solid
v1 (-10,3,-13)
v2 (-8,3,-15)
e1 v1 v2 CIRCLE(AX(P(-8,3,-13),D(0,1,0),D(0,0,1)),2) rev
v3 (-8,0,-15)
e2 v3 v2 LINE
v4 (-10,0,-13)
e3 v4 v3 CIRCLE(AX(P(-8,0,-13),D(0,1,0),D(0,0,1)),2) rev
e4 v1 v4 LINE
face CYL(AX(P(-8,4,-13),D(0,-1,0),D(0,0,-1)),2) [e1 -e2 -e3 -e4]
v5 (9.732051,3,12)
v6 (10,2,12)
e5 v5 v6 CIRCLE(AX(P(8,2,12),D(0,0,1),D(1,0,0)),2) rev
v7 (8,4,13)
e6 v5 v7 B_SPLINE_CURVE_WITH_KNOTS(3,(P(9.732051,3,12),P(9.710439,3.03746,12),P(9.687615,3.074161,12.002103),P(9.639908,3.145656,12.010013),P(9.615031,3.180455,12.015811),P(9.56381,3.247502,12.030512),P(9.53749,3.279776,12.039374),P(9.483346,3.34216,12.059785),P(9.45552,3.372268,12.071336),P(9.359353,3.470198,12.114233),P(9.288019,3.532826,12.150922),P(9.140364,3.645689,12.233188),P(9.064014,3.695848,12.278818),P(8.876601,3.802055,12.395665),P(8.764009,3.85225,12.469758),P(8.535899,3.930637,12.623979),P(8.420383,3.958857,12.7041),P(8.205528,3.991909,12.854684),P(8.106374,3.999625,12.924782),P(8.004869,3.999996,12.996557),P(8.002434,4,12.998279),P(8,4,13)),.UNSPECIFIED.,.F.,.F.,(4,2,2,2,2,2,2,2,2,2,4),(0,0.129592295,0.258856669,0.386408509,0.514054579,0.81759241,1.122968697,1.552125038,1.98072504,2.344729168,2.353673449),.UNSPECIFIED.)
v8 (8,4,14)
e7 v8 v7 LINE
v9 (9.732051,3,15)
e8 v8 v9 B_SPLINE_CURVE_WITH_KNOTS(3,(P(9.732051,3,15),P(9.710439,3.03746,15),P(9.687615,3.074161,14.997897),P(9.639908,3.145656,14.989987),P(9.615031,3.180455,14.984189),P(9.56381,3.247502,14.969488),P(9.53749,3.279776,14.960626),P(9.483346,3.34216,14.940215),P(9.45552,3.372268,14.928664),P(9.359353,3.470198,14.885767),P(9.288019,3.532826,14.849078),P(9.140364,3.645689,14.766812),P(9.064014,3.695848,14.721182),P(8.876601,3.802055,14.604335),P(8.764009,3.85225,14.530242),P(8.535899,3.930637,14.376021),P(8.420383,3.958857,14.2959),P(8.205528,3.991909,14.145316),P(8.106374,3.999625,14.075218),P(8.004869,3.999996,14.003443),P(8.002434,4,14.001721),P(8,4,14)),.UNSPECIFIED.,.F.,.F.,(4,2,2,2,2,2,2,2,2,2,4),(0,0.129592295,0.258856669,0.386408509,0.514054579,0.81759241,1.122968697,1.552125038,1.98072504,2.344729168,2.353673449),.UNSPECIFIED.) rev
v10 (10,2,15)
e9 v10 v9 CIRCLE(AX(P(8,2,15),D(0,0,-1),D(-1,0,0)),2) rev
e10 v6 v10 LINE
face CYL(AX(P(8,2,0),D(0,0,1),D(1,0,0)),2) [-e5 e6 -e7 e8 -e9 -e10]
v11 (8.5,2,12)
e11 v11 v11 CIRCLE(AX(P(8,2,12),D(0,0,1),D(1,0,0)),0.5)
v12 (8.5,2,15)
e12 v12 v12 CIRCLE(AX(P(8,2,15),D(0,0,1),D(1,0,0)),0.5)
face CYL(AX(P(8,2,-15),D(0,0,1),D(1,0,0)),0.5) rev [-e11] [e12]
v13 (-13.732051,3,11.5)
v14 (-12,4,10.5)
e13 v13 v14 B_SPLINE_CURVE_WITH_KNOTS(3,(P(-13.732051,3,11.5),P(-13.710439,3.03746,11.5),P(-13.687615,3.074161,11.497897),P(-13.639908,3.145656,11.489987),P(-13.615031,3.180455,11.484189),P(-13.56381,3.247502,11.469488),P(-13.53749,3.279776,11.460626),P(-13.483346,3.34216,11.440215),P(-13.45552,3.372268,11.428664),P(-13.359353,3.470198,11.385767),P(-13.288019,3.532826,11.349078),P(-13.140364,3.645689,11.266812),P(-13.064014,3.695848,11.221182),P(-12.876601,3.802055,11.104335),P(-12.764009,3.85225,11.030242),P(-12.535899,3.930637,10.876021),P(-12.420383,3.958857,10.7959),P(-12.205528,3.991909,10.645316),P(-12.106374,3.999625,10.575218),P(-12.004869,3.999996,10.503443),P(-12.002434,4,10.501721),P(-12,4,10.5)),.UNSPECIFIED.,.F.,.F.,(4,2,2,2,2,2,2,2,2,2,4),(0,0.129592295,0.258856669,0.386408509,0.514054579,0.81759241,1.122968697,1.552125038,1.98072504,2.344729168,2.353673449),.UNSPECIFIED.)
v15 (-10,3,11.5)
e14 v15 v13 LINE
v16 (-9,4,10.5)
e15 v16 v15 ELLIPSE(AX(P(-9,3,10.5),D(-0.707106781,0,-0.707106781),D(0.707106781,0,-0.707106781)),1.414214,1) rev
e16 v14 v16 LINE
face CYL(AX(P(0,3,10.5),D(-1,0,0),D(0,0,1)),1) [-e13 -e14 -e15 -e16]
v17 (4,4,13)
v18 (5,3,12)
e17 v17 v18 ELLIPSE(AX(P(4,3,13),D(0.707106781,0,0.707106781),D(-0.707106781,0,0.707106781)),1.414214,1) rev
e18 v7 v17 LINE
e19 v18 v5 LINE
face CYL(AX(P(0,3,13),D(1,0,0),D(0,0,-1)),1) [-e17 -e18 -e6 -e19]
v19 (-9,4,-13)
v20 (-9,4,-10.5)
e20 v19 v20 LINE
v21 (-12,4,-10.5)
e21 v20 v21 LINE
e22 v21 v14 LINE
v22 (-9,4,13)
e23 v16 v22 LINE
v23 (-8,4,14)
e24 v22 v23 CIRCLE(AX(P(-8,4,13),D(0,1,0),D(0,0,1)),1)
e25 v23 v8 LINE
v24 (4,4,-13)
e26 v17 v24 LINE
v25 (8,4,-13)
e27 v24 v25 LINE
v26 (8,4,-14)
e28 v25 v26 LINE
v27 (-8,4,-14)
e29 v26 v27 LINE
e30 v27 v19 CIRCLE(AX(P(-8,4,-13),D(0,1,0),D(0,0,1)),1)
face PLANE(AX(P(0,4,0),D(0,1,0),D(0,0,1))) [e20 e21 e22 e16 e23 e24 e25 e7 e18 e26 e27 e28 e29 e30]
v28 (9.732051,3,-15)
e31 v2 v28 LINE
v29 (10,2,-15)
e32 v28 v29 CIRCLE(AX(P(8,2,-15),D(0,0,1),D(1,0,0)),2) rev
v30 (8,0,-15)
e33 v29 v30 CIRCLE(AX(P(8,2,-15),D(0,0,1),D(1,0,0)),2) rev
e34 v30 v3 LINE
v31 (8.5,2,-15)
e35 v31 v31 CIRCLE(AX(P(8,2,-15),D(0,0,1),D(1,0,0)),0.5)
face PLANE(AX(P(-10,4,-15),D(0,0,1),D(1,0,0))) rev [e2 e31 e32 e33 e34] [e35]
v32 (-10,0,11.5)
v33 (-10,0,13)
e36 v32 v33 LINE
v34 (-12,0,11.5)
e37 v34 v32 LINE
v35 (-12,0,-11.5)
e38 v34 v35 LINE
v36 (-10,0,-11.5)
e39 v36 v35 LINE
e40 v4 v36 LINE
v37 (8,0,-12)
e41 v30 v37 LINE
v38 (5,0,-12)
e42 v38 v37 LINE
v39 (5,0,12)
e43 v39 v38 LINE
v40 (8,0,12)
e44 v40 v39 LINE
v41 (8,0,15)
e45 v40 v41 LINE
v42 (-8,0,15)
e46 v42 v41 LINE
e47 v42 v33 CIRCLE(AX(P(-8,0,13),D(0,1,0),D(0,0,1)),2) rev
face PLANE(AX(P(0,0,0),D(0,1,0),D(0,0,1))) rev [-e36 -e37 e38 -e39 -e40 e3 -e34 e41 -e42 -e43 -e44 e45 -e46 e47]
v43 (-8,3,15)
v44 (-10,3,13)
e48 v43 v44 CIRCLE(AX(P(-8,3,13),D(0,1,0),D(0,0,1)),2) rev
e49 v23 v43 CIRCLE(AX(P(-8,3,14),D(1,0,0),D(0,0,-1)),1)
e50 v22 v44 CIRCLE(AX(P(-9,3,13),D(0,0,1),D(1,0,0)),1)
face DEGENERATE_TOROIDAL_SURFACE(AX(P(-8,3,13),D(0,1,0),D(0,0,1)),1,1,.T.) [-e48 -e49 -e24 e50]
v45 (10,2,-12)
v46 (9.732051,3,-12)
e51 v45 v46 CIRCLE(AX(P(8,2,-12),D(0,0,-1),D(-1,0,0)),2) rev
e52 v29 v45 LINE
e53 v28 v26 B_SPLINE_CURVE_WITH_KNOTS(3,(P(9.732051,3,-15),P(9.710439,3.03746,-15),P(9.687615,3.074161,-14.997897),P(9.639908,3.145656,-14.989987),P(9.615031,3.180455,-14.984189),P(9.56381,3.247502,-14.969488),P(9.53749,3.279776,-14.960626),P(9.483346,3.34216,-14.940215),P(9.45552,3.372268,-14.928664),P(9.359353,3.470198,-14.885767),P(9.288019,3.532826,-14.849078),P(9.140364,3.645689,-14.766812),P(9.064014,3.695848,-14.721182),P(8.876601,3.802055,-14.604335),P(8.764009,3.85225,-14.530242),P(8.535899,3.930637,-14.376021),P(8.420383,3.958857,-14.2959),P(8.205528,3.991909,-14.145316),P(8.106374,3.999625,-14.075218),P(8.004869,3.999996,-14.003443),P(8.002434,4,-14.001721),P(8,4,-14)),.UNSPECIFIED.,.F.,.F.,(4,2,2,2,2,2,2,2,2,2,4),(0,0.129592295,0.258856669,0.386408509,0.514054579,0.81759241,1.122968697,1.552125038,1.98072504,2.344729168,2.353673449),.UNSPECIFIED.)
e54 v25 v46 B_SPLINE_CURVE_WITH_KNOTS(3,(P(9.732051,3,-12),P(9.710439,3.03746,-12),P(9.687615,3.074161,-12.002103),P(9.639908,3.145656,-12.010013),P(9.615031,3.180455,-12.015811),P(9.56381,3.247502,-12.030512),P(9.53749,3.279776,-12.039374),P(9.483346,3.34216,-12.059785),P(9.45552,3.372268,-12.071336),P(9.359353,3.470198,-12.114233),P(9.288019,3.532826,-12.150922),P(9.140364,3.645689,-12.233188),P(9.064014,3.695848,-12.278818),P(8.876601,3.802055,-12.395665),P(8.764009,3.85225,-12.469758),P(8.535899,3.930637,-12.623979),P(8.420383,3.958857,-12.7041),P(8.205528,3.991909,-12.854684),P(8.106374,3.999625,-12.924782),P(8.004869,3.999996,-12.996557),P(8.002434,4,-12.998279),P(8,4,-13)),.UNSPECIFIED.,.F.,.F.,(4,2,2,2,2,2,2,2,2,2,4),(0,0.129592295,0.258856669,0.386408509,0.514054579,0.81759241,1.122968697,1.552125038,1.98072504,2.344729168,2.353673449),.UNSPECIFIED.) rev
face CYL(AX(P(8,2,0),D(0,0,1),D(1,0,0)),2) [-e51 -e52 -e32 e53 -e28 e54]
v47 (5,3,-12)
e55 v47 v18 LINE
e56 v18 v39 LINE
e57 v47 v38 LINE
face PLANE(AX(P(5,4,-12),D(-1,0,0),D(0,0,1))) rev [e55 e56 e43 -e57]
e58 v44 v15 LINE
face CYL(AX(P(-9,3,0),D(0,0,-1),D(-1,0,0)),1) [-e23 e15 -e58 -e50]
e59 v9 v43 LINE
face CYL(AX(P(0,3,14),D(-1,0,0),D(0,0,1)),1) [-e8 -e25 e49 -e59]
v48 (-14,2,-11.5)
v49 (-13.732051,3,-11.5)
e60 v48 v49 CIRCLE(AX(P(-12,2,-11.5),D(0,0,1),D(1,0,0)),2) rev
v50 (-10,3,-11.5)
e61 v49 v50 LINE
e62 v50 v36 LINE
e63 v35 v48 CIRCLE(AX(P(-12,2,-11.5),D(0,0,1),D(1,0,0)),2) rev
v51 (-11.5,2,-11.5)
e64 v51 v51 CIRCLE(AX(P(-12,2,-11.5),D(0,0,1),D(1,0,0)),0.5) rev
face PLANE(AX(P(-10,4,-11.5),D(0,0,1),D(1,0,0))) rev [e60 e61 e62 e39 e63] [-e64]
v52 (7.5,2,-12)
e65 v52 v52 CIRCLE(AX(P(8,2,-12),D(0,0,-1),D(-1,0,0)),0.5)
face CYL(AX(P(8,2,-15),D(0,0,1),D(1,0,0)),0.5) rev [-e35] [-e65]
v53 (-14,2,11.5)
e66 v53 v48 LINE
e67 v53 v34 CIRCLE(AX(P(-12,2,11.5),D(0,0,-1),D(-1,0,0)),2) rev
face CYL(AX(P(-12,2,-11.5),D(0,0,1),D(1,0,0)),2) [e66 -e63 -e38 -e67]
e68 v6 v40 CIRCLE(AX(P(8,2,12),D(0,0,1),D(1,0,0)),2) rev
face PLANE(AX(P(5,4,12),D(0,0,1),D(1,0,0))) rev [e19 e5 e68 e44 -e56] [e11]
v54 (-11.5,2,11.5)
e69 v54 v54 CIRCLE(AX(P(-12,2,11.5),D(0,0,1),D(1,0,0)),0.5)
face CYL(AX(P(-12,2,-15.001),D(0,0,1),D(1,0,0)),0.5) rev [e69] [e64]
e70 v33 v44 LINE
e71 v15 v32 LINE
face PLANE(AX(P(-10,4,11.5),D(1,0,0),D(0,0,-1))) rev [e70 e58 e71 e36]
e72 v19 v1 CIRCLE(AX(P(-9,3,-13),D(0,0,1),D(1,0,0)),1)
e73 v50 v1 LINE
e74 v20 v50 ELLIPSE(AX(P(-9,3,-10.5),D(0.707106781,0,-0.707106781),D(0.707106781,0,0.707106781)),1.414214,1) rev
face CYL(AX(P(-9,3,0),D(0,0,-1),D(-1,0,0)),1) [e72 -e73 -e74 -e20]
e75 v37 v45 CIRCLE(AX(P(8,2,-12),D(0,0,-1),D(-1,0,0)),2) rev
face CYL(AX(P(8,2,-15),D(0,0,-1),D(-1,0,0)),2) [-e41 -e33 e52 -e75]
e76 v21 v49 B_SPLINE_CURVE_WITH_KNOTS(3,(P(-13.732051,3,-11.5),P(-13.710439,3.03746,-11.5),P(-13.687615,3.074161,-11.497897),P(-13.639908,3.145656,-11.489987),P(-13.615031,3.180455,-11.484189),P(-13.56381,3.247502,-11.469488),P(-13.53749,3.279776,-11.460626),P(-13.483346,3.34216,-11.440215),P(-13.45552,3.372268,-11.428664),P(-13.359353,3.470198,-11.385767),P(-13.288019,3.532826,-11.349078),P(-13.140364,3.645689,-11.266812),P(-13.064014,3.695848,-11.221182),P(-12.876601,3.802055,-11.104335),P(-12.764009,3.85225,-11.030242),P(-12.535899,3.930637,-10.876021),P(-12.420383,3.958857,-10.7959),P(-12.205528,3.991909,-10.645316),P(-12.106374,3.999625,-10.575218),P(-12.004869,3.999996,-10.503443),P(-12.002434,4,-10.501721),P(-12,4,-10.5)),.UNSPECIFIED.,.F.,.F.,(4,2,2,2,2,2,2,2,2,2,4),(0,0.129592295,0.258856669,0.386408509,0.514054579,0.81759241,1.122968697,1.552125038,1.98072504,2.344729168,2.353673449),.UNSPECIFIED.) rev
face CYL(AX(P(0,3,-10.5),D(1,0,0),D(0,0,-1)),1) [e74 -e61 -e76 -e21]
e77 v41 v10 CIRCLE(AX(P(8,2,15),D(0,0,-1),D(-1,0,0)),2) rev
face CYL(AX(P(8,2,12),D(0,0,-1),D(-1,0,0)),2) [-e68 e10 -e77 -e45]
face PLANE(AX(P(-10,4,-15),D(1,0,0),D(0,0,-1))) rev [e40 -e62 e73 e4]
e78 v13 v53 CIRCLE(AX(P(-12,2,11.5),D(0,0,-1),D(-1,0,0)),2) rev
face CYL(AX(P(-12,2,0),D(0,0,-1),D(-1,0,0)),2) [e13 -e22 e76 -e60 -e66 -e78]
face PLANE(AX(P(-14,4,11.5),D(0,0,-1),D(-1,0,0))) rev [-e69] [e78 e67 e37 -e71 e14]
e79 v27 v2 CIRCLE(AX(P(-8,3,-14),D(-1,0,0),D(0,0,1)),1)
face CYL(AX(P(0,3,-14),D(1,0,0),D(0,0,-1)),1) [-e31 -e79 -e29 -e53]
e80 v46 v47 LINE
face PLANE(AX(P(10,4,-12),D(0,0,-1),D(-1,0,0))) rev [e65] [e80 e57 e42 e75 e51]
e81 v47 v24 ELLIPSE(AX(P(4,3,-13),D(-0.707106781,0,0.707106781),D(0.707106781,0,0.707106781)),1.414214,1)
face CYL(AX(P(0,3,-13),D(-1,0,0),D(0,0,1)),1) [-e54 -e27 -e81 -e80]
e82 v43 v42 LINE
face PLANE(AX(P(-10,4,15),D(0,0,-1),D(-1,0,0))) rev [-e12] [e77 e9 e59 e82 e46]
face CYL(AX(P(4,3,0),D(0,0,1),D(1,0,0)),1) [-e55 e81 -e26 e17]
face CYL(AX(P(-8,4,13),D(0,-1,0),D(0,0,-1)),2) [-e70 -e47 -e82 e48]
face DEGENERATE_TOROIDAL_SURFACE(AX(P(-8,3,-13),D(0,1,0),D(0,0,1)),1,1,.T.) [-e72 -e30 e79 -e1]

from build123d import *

# Parameters (mm, degrees)
EXTRUDE_1_DEPTH          = 4
CUT_EXTRUDE_1_DEPTH      = 31.6757233
CUT_EXTRUDE_1_DEPTH_BACK = 31.6757233
SKETCH_2_R               = 0.5
CUT_EXTRUDE_2_REACH      = 32.237
SKETCH_3_R               = 0.5
FILLET_1_R               = 2
FILLET_2_R               = 1


# Some blends are built 0.0001 mm under size
with BuildPart() as part:
    # Эскиз1 → Бобышка-Вытянуть1 (new body)
    with BuildSketch(Plane(origin=(0, 0, 0), x_dir=(1, 0, 0), z_dir=(0, 1, 0))):
        Polygon((-10, 15), (10, 15), (10, 12), (5, 12), (5, -12), (10, -12), (10, -15), (-10, -15), (-10, -11.5), (-14, -11.5), (-14, 11.5), (-10, 11.5), align=None)
    extrude(amount=EXTRUDE_1_DEPTH)

    # Эскиз2 → Вырез-Вытянуть1 (cut, two sides: drawn at the far end of the back side and taken through both)
    with BuildSketch(Plane.XY.offset(-12).offset(-CUT_EXTRUDE_1_DEPTH_BACK)):
        with Locations((8, 2)):
            Circle(SKETCH_2_R)
    extrude(amount=CUT_EXTRUDE_1_DEPTH + CUT_EXTRUDE_1_DEPTH_BACK, mode=Mode.SUBTRACT)

    # Эскиз3 → Вырез-Вытянуть2 (cut, up to next)
    with BuildSketch(Plane.XY.offset(11.5), mode=Mode.PRIVATE) as cut_extrude_2_sk1:
        with Locations((-12, 2)):
            Circle(SKETCH_3_R)
    cut_extrude_2_tool1 = extrude(cut_extrude_2_sk1.sketch, amount=-CUT_EXTRUDE_2_REACH, mode=Mode.PRIVATE) & part.part
    add(cut_extrude_2_tool1.solids().sort_by_distance((-12, 2, 11.5))[0], mode=Mode.SUBTRACT)

    # Скругление1
    fillet_1_edges = [part.edges().sort_by_distance(p)[0] for p in [
        (10, 0, -13.5),
        (10, 4, -13.5),
        (10, 0, 13.5),
        (10, 4, 13.5),
        (-14, 0, 0),
        (-14, 4, 0),
        (-10, 2, -15),
        (-10, 2, 15),
    ]]
    fillet(fillet_1_edges, radius=FILLET_1_R - 0.0001)  # a hair under: the kernel refuses the full size

    # Скругление2
    # the kernel refuses this fillet: 1 mm, written as the material it takes off along each edge
    with BuildSketch(Plane(origin=(5, 4, -12), x_dir=(-1, 0, 0), z_dir=(0, 0, 1))) as fillet_2_piece_1:
        with BuildLine():
            CenterArc((FILLET_2_R, FILLET_2_R), FILLET_2_R, 180, 90)
            Line((0, FILLET_2_R), (0, 0))
            Line((0, 0), (FILLET_2_R, 0))
        make_face()
    extrude(amount=24, mode=Mode.SUBTRACT)
    with BuildSketch(Plane(origin=(10.5001, 4, -12), x_dir=(0, 0, -1), z_dir=(-1, 0, 0)), Plane(origin=(5, 4, 12), x_dir=(0, 0, 1), z_dir=(1, 0, 0))) as fillet_2_piece_2:
        with BuildLine():
            CenterArc((FILLET_2_R, FILLET_2_R), FILLET_2_R, 180, 90)
            Line((0, FILLET_2_R), (0, 0))
            Line((0, 0), (FILLET_2_R, 0))
        make_face()
    extrude(amount=5.5001, mode=Mode.SUBTRACT)
    with BuildSketch(Plane(origin=(-14.5001, 4, -11.5), x_dir=(0, 0, 1), z_dir=(1, 0, 0)), Plane(origin=(-10, 4, 11.5), x_dir=(0, 0, -1), z_dir=(-1, 0, 0))) as fillet_2_piece_3:
        with BuildLine():
            CenterArc((FILLET_2_R, FILLET_2_R), FILLET_2_R, 180, 90)
            Line((0, FILLET_2_R), (0, 0))
            Line((0, 0), (FILLET_2_R, 0))
        make_face()
    extrude(amount=4.5001, mode=Mode.SUBTRACT)
    with BuildSketch(Plane(origin=(-10, 4, 13.0001), x_dir=(1, 0, 0), z_dir=(0, 0, -1)), Plane(origin=(-10, 4, -11.5), x_dir=(1, 0, 0), z_dir=(0, 0, -1))) as fillet_2_piece_4:
        with BuildLine():
            CenterArc((FILLET_2_R, FILLET_2_R), FILLET_2_R, 180, 90)
            Line((0, FILLET_2_R), (0, 0))
            Line((0, 0), (FILLET_2_R, 0))
        make_face()
    extrude(amount=1.5001, mode=Mode.SUBTRACT)
    with BuildSketch(Plane(origin=(-8.0001, 4, -15), x_dir=(0, -1, 0), z_dir=(1, 0, 0))) as fillet_2_piece_5:
        with BuildLine():
            CenterArc((FILLET_2_R, -FILLET_2_R), FILLET_2_R, 90, 90)
            Line((0, -FILLET_2_R), (0, 0))
            Line((0, 0), (FILLET_2_R, 0))
        make_face()
    extrude(amount=18.5002, mode=Mode.SUBTRACT)
    with BuildSketch(Plane(origin=(10.5001, 4, 15), x_dir=(0, 0, -1), z_dir=(-1, 0, 0))) as fillet_2_piece_6:
        with BuildLine():
            CenterArc((FILLET_2_R, FILLET_2_R), FILLET_2_R, 180, 90)
            Line((0, FILLET_2_R), (0, 0))
            Line((0, 0), (FILLET_2_R, 0))
        make_face()
    extrude(amount=18.5002, mode=Mode.SUBTRACT)
    with BuildSketch(Plane(origin=(-8.0001, 4, 13.0001), x_dir=(0, 0, 1), z_dir=(1, 0, 0))) as fillet_2_piece_7:
        with BuildLine():
            CenterArc((1.9999 - FILLET_2_R, FILLET_2_R), FILLET_2_R, 270, 90)
            Line((1.9999, FILLET_2_R), (1.9999, 0))
            Line((1.9999, 0), (1.9999 - FILLET_2_R, 0))
        make_face()
    revolve(axis=Axis((-8.0001, 4, 13.0001), (0, -1, 0)), revolution_arc=90, mode=Mode.SUBTRACT)
    with BuildSketch(Plane(origin=(-8.0001, 4, -13.0001), x_dir=(0, 0, -1), z_dir=(1, 0, 0))) as fillet_2_piece_8:
        with BuildLine():
            CenterArc((1.9999 - FILLET_2_R, -FILLET_2_R), FILLET_2_R, 0, 90)
            Line((1.9999 - FILLET_2_R, 0), (1.9999, 0))
            Line((1.9999, 0), (1.9999, -FILLET_2_R))
        make_face()
    revolve(axis=Axis((-8.0001, 4, -13.0001), (0, 1, 0)), revolution_arc=90, mode=Mode.SUBTRACT)
    with BuildSketch(Plane(origin=(10.5001, 4, -12), x_dir=(0, 0, -1), z_dir=(-1, 0, 0))) as fillet_2_piece_9a_section:
        with BuildLine():
            CenterArc((FILLET_2_R, FILLET_2_R), FILLET_2_R, 180, 90)
            Line((0, FILLET_2_R), (0, 0))
            Line((0, 0), (FILLET_2_R, 0))
        make_face()
    fillet_2_piece_9a = extrude(amount=8.0001, mode=Mode.PRIVATE)
    fillet_2_piece_9a = split(fillet_2_piece_9a, bisect_by=Plane(origin=(5, 3.773604886, -12.226395114), z_dir=(-1, 0, 0)), keep=Keep.TOP, mode=Mode.PRIVATE)
    with BuildSketch(Plane(origin=(5, 4, -14.5), x_dir=(-1, 0, 0), z_dir=(0, 0, 1))) as fillet_2_piece_9b_section:
        with BuildLine():
            CenterArc((FILLET_2_R, FILLET_2_R), FILLET_2_R, 180, 90)
            Line((0, FILLET_2_R), (0, 0))
            Line((0, 0), (FILLET_2_R, 0))
        make_face()
    fillet_2_piece_9b = extrude(amount=26.5, mode=Mode.PRIVATE)
    fillet_2_piece_9b = split(fillet_2_piece_9b, bisect_by=Plane(origin=(4.773604886, 3.773604886, -12), z_dir=(0, 0, -1)), keep=Keep.TOP, mode=Mode.PRIVATE)
    fillet_2_piece_9 = fillet_2_piece_9a & fillet_2_piece_9b
    add(fillet_2_piece_9, mode=Mode.SUBTRACT)
    with BuildSketch(Plane(origin=(5, 4, -12), x_dir=(-1, 0, 0), z_dir=(0, 0, 1))) as fillet_2_piece_10a_section:
        with BuildLine():
            CenterArc((FILLET_2_R, FILLET_2_R), FILLET_2_R, 180, 90)
            Line((0, FILLET_2_R), (0, 0))
            Line((0, 0), (FILLET_2_R, 0))
        make_face()
    fillet_2_piece_10a = extrude(amount=26.5, mode=Mode.PRIVATE)
    fillet_2_piece_10a = split(fillet_2_piece_10a, bisect_by=Plane(origin=(4.773604886, 3.773604886, 12), z_dir=(0, 0, 1)), keep=Keep.TOP, mode=Mode.PRIVATE)
    with BuildSketch(Plane(origin=(2.5, 4, 12), x_dir=(0, 0, 1), z_dir=(1, 0, 0))) as fillet_2_piece_10b_section:
        with BuildLine():
            CenterArc((FILLET_2_R, FILLET_2_R), FILLET_2_R, 180, 90)
            Line((0, FILLET_2_R), (0, 0))
            Line((0, 0), (FILLET_2_R, 0))
        make_face()
    fillet_2_piece_10b = extrude(amount=8.0001, mode=Mode.PRIVATE)
    fillet_2_piece_10b = split(fillet_2_piece_10b, bisect_by=Plane(origin=(5, 3.773604886, 12.226395114), z_dir=(-1, 0, 0)), keep=Keep.TOP, mode=Mode.PRIVATE)
    fillet_2_piece_10 = fillet_2_piece_10a & fillet_2_piece_10b
    add(fillet_2_piece_10, mode=Mode.SUBTRACT)
    with BuildSketch(Plane(origin=(-10, 4, -9), x_dir=(1, 0, 0), z_dir=(0, 0, -1))) as fillet_2_piece_11a_section:
        with BuildLine():
            CenterArc((FILLET_2_R, FILLET_2_R), FILLET_2_R, 180, 90)
            Line((0, FILLET_2_R), (0, 0))
            Line((0, 0), (FILLET_2_R, 0))
        make_face()
    fillet_2_piece_11a = extrude(amount=4.0001, mode=Mode.PRIVATE)
    fillet_2_piece_11a = split(fillet_2_piece_11a, bisect_by=Plane(origin=(-9.773604886, 3.773604886, -11.5), z_dir=(0, 0, 1)), keep=Keep.TOP, mode=Mode.PRIVATE)
    with BuildSketch(Plane(origin=(-14.5001, 4, -11.5), x_dir=(0, 0, 1), z_dir=(1, 0, 0))) as fillet_2_piece_11b_section:
        with BuildLine():
            CenterArc((FILLET_2_R, FILLET_2_R), FILLET_2_R, 180, 90)
            Line((0, FILLET_2_R), (0, 0))
            Line((0, 0), (FILLET_2_R, 0))
        make_face()
    fillet_2_piece_11b = extrude(amount=7.0001, mode=Mode.PRIVATE)
    fillet_2_piece_11b = split(fillet_2_piece_11b, bisect_by=Plane(origin=(-10, 3.773604886, -11.273604886), z_dir=(1, 0, 0)), keep=Keep.TOP, mode=Mode.PRIVATE)
    fillet_2_piece_11 = fillet_2_piece_11a & fillet_2_piece_11b
    add(fillet_2_piece_11, mode=Mode.SUBTRACT)
    with BuildSketch(Plane(origin=(-7.5, 4, 11.5), x_dir=(0, 0, -1), z_dir=(-1, 0, 0))) as fillet_2_piece_12a_section:
        with BuildLine():
            CenterArc((FILLET_2_R, FILLET_2_R), FILLET_2_R, 180, 90)
            Line((0, FILLET_2_R), (0, 0))
            Line((0, 0), (FILLET_2_R, 0))
        make_face()
    fillet_2_piece_12a = extrude(amount=7.0001, mode=Mode.PRIVATE)
    fillet_2_piece_12a = split(fillet_2_piece_12a, bisect_by=Plane(origin=(-10, 3.773604886, 11.273604886), z_dir=(1, 0, 0)), keep=Keep.TOP, mode=Mode.PRIVATE)
    with BuildSketch(Plane(origin=(-10, 4, 13.0001), x_dir=(1, 0, 0), z_dir=(0, 0, -1))) as fillet_2_piece_12b_section:
        with BuildLine():
            CenterArc((FILLET_2_R, FILLET_2_R), FILLET_2_R, 180, 90)
            Line((0, FILLET_2_R), (0, 0))
            Line((0, 0), (FILLET_2_R, 0))
        make_face()
    fillet_2_piece_12b = extrude(amount=4.0001, mode=Mode.PRIVATE)
    fillet_2_piece_12b = split(fillet_2_piece_12b, bisect_by=Plane(origin=(-9.773604886, 3.773604886, 11.5), z_dir=(0, 0, -1)), keep=Keep.TOP, mode=Mode.PRIVATE)
    fillet_2_piece_12 = fillet_2_piece_12a & fillet_2_piece_12b
    add(fillet_2_piece_12, mode=Mode.SUBTRACT)


solid = part.part
